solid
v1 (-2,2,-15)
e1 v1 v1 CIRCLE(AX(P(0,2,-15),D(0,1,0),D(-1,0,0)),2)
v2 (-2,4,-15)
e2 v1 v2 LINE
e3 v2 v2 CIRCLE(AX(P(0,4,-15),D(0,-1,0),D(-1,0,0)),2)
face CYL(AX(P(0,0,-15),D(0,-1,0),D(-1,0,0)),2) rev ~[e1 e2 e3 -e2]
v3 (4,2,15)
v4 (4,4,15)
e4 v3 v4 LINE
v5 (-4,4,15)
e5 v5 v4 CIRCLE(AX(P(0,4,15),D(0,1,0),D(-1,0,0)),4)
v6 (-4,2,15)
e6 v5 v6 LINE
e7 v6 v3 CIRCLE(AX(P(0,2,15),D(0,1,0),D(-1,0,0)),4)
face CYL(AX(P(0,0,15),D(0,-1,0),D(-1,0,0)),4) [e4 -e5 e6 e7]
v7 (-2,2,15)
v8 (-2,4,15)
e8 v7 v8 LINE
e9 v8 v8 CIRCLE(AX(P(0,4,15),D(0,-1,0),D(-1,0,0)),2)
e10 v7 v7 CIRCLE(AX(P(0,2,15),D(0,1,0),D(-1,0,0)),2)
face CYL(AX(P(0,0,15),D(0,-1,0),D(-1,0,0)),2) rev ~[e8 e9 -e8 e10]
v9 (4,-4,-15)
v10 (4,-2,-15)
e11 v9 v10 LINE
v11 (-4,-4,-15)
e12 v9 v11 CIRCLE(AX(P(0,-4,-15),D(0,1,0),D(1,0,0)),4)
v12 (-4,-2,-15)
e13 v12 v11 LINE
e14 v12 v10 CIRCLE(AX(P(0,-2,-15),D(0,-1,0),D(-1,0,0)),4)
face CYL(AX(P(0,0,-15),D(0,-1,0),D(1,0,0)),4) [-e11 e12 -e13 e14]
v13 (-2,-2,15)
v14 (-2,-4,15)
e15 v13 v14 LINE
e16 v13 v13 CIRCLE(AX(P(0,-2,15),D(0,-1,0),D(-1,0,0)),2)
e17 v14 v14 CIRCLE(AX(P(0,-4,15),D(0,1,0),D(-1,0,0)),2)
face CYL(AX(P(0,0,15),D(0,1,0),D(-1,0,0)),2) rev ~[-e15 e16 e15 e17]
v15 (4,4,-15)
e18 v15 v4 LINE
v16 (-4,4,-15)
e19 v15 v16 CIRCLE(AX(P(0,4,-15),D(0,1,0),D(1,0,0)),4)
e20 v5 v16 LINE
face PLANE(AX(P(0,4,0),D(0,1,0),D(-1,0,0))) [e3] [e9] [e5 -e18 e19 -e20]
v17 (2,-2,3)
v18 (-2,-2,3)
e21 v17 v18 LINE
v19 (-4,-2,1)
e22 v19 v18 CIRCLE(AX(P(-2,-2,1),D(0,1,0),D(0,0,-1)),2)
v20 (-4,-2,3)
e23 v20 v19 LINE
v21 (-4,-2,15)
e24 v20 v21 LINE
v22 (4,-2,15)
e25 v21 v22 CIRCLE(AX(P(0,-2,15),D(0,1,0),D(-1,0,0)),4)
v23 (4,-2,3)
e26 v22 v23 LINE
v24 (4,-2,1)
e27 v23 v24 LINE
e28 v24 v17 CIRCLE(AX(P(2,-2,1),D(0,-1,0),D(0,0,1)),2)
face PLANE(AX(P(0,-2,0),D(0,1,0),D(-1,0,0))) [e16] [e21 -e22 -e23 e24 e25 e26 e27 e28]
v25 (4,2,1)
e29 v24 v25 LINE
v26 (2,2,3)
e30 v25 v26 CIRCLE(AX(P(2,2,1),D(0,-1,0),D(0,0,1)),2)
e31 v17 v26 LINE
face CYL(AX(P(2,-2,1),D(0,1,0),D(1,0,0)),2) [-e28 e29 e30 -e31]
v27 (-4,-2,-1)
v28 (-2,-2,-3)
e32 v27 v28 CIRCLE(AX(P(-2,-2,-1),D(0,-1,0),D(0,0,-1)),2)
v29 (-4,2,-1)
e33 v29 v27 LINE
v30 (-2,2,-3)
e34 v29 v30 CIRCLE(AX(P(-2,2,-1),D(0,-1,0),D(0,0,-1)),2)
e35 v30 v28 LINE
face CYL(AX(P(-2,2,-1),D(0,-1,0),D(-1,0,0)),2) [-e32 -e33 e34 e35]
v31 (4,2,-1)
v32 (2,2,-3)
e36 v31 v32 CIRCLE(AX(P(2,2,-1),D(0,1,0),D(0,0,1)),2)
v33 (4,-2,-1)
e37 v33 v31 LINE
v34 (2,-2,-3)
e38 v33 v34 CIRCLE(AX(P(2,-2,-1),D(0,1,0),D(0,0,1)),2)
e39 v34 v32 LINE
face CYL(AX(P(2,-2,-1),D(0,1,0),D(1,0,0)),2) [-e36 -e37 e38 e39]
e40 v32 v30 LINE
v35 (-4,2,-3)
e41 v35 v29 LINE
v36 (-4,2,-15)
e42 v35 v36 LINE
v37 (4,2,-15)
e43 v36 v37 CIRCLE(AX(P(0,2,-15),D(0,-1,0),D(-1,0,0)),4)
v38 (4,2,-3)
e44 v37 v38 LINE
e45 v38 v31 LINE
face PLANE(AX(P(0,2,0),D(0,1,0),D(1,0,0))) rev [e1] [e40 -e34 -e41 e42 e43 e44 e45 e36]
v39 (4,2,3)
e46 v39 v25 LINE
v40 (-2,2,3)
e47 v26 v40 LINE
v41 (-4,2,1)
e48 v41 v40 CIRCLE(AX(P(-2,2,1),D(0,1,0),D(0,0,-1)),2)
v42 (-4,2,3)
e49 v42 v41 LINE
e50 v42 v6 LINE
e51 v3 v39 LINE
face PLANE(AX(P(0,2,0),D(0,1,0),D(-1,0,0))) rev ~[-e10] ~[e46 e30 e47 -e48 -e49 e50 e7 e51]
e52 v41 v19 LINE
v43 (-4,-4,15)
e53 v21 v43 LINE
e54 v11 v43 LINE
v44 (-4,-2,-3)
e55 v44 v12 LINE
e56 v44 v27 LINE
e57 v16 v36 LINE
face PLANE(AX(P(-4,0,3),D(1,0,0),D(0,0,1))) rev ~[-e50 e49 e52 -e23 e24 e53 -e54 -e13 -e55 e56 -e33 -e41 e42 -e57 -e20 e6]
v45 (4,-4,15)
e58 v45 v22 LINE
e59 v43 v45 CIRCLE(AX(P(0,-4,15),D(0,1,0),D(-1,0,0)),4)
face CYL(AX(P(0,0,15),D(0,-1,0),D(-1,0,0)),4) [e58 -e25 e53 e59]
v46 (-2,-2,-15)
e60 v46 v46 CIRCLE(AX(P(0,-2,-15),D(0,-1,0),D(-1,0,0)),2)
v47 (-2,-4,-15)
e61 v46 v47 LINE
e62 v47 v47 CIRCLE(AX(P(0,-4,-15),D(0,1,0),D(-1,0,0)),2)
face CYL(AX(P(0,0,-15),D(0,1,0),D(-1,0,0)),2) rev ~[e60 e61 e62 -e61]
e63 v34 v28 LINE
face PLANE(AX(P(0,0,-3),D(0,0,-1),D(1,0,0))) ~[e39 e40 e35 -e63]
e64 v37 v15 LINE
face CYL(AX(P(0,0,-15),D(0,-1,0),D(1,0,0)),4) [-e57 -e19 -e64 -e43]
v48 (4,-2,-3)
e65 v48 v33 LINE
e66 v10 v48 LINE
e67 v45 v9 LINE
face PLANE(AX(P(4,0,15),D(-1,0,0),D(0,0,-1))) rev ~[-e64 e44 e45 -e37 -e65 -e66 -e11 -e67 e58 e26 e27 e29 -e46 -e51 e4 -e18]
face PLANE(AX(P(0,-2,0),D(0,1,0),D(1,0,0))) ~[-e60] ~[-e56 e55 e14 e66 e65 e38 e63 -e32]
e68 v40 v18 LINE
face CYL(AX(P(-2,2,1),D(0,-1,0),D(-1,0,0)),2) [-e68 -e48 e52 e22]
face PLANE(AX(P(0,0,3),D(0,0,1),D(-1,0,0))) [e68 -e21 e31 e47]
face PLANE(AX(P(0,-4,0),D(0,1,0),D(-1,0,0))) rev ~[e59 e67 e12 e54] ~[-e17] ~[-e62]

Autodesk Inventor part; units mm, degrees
ref_plane "YZ Plane" through (0, 0, 0) normal (1, 0, 0) x (0, 1, 0)
ref_plane "XZ Plane" through (0, 0, 0) normal (0, 1, 0) x (-1, 0, 0)
ref_plane "XY Plane" through (0, 0, 0) normal (0, 0, 1) x (1, 0, 0)
sketch "Szkic1" plane through (0, 0, 0) normal (0, 1, 0) x (-1, 0, 0)
  line L0 (0, 15) -> (0, -15) construction
  line L1 (-4, 15) -> (-4, -15)
  line L2 (4, -15) -> (4, 15)
  arc A0 (4, 15) -> (-4, 15) centre (0, 15) ccw
  arc A1 (-4, -15) -> (4, -15) centre (0, -15) ccw
  circle A2 centre (0, -15) radius 2
  circle A3 centre (0, 15) radius 2
  line L3 (0, 15) -> (0, 3)
  line L4 (0, 3) -> (4, 3)
  line L5 (0, 3) -> (-4, 3)
  point P0 (0, 0)
  dimension "d0" = 15
  dimension "d1" = 8
  dimension "d2" = 4
  dimension "d3" = 4
  dimension "d6" = 12
extrude "Wyciągnięcie proste1" add sketch "Szkic1" along normal mid plane 8 contours A0 L2 L4 L5 L1 | L5 L4 L2 A1 L1 | A2 | A3
extrude "Wyciągnięcie proste2" cut sketch "Szkic1" along normal mid plane 4 contours A0 L2 L4 L5 L1
extrude "Wyciągnięcie proste3" cut sketch "Szkic1" along normal mid plane 14.5 contours A3
mirror "Odbij1" about plane through (0, 0, 0) normal (0, 0, 1) of "Wyciągnięcie proste2", "Wyciągnięcie proste3"
fillet "Zaokrąglenie1" radius 2 4 edges at (-4, 0, 3) (-4, 0, -3) (4, 0, -3) (4, 0, 3)
properties part number "connector"
